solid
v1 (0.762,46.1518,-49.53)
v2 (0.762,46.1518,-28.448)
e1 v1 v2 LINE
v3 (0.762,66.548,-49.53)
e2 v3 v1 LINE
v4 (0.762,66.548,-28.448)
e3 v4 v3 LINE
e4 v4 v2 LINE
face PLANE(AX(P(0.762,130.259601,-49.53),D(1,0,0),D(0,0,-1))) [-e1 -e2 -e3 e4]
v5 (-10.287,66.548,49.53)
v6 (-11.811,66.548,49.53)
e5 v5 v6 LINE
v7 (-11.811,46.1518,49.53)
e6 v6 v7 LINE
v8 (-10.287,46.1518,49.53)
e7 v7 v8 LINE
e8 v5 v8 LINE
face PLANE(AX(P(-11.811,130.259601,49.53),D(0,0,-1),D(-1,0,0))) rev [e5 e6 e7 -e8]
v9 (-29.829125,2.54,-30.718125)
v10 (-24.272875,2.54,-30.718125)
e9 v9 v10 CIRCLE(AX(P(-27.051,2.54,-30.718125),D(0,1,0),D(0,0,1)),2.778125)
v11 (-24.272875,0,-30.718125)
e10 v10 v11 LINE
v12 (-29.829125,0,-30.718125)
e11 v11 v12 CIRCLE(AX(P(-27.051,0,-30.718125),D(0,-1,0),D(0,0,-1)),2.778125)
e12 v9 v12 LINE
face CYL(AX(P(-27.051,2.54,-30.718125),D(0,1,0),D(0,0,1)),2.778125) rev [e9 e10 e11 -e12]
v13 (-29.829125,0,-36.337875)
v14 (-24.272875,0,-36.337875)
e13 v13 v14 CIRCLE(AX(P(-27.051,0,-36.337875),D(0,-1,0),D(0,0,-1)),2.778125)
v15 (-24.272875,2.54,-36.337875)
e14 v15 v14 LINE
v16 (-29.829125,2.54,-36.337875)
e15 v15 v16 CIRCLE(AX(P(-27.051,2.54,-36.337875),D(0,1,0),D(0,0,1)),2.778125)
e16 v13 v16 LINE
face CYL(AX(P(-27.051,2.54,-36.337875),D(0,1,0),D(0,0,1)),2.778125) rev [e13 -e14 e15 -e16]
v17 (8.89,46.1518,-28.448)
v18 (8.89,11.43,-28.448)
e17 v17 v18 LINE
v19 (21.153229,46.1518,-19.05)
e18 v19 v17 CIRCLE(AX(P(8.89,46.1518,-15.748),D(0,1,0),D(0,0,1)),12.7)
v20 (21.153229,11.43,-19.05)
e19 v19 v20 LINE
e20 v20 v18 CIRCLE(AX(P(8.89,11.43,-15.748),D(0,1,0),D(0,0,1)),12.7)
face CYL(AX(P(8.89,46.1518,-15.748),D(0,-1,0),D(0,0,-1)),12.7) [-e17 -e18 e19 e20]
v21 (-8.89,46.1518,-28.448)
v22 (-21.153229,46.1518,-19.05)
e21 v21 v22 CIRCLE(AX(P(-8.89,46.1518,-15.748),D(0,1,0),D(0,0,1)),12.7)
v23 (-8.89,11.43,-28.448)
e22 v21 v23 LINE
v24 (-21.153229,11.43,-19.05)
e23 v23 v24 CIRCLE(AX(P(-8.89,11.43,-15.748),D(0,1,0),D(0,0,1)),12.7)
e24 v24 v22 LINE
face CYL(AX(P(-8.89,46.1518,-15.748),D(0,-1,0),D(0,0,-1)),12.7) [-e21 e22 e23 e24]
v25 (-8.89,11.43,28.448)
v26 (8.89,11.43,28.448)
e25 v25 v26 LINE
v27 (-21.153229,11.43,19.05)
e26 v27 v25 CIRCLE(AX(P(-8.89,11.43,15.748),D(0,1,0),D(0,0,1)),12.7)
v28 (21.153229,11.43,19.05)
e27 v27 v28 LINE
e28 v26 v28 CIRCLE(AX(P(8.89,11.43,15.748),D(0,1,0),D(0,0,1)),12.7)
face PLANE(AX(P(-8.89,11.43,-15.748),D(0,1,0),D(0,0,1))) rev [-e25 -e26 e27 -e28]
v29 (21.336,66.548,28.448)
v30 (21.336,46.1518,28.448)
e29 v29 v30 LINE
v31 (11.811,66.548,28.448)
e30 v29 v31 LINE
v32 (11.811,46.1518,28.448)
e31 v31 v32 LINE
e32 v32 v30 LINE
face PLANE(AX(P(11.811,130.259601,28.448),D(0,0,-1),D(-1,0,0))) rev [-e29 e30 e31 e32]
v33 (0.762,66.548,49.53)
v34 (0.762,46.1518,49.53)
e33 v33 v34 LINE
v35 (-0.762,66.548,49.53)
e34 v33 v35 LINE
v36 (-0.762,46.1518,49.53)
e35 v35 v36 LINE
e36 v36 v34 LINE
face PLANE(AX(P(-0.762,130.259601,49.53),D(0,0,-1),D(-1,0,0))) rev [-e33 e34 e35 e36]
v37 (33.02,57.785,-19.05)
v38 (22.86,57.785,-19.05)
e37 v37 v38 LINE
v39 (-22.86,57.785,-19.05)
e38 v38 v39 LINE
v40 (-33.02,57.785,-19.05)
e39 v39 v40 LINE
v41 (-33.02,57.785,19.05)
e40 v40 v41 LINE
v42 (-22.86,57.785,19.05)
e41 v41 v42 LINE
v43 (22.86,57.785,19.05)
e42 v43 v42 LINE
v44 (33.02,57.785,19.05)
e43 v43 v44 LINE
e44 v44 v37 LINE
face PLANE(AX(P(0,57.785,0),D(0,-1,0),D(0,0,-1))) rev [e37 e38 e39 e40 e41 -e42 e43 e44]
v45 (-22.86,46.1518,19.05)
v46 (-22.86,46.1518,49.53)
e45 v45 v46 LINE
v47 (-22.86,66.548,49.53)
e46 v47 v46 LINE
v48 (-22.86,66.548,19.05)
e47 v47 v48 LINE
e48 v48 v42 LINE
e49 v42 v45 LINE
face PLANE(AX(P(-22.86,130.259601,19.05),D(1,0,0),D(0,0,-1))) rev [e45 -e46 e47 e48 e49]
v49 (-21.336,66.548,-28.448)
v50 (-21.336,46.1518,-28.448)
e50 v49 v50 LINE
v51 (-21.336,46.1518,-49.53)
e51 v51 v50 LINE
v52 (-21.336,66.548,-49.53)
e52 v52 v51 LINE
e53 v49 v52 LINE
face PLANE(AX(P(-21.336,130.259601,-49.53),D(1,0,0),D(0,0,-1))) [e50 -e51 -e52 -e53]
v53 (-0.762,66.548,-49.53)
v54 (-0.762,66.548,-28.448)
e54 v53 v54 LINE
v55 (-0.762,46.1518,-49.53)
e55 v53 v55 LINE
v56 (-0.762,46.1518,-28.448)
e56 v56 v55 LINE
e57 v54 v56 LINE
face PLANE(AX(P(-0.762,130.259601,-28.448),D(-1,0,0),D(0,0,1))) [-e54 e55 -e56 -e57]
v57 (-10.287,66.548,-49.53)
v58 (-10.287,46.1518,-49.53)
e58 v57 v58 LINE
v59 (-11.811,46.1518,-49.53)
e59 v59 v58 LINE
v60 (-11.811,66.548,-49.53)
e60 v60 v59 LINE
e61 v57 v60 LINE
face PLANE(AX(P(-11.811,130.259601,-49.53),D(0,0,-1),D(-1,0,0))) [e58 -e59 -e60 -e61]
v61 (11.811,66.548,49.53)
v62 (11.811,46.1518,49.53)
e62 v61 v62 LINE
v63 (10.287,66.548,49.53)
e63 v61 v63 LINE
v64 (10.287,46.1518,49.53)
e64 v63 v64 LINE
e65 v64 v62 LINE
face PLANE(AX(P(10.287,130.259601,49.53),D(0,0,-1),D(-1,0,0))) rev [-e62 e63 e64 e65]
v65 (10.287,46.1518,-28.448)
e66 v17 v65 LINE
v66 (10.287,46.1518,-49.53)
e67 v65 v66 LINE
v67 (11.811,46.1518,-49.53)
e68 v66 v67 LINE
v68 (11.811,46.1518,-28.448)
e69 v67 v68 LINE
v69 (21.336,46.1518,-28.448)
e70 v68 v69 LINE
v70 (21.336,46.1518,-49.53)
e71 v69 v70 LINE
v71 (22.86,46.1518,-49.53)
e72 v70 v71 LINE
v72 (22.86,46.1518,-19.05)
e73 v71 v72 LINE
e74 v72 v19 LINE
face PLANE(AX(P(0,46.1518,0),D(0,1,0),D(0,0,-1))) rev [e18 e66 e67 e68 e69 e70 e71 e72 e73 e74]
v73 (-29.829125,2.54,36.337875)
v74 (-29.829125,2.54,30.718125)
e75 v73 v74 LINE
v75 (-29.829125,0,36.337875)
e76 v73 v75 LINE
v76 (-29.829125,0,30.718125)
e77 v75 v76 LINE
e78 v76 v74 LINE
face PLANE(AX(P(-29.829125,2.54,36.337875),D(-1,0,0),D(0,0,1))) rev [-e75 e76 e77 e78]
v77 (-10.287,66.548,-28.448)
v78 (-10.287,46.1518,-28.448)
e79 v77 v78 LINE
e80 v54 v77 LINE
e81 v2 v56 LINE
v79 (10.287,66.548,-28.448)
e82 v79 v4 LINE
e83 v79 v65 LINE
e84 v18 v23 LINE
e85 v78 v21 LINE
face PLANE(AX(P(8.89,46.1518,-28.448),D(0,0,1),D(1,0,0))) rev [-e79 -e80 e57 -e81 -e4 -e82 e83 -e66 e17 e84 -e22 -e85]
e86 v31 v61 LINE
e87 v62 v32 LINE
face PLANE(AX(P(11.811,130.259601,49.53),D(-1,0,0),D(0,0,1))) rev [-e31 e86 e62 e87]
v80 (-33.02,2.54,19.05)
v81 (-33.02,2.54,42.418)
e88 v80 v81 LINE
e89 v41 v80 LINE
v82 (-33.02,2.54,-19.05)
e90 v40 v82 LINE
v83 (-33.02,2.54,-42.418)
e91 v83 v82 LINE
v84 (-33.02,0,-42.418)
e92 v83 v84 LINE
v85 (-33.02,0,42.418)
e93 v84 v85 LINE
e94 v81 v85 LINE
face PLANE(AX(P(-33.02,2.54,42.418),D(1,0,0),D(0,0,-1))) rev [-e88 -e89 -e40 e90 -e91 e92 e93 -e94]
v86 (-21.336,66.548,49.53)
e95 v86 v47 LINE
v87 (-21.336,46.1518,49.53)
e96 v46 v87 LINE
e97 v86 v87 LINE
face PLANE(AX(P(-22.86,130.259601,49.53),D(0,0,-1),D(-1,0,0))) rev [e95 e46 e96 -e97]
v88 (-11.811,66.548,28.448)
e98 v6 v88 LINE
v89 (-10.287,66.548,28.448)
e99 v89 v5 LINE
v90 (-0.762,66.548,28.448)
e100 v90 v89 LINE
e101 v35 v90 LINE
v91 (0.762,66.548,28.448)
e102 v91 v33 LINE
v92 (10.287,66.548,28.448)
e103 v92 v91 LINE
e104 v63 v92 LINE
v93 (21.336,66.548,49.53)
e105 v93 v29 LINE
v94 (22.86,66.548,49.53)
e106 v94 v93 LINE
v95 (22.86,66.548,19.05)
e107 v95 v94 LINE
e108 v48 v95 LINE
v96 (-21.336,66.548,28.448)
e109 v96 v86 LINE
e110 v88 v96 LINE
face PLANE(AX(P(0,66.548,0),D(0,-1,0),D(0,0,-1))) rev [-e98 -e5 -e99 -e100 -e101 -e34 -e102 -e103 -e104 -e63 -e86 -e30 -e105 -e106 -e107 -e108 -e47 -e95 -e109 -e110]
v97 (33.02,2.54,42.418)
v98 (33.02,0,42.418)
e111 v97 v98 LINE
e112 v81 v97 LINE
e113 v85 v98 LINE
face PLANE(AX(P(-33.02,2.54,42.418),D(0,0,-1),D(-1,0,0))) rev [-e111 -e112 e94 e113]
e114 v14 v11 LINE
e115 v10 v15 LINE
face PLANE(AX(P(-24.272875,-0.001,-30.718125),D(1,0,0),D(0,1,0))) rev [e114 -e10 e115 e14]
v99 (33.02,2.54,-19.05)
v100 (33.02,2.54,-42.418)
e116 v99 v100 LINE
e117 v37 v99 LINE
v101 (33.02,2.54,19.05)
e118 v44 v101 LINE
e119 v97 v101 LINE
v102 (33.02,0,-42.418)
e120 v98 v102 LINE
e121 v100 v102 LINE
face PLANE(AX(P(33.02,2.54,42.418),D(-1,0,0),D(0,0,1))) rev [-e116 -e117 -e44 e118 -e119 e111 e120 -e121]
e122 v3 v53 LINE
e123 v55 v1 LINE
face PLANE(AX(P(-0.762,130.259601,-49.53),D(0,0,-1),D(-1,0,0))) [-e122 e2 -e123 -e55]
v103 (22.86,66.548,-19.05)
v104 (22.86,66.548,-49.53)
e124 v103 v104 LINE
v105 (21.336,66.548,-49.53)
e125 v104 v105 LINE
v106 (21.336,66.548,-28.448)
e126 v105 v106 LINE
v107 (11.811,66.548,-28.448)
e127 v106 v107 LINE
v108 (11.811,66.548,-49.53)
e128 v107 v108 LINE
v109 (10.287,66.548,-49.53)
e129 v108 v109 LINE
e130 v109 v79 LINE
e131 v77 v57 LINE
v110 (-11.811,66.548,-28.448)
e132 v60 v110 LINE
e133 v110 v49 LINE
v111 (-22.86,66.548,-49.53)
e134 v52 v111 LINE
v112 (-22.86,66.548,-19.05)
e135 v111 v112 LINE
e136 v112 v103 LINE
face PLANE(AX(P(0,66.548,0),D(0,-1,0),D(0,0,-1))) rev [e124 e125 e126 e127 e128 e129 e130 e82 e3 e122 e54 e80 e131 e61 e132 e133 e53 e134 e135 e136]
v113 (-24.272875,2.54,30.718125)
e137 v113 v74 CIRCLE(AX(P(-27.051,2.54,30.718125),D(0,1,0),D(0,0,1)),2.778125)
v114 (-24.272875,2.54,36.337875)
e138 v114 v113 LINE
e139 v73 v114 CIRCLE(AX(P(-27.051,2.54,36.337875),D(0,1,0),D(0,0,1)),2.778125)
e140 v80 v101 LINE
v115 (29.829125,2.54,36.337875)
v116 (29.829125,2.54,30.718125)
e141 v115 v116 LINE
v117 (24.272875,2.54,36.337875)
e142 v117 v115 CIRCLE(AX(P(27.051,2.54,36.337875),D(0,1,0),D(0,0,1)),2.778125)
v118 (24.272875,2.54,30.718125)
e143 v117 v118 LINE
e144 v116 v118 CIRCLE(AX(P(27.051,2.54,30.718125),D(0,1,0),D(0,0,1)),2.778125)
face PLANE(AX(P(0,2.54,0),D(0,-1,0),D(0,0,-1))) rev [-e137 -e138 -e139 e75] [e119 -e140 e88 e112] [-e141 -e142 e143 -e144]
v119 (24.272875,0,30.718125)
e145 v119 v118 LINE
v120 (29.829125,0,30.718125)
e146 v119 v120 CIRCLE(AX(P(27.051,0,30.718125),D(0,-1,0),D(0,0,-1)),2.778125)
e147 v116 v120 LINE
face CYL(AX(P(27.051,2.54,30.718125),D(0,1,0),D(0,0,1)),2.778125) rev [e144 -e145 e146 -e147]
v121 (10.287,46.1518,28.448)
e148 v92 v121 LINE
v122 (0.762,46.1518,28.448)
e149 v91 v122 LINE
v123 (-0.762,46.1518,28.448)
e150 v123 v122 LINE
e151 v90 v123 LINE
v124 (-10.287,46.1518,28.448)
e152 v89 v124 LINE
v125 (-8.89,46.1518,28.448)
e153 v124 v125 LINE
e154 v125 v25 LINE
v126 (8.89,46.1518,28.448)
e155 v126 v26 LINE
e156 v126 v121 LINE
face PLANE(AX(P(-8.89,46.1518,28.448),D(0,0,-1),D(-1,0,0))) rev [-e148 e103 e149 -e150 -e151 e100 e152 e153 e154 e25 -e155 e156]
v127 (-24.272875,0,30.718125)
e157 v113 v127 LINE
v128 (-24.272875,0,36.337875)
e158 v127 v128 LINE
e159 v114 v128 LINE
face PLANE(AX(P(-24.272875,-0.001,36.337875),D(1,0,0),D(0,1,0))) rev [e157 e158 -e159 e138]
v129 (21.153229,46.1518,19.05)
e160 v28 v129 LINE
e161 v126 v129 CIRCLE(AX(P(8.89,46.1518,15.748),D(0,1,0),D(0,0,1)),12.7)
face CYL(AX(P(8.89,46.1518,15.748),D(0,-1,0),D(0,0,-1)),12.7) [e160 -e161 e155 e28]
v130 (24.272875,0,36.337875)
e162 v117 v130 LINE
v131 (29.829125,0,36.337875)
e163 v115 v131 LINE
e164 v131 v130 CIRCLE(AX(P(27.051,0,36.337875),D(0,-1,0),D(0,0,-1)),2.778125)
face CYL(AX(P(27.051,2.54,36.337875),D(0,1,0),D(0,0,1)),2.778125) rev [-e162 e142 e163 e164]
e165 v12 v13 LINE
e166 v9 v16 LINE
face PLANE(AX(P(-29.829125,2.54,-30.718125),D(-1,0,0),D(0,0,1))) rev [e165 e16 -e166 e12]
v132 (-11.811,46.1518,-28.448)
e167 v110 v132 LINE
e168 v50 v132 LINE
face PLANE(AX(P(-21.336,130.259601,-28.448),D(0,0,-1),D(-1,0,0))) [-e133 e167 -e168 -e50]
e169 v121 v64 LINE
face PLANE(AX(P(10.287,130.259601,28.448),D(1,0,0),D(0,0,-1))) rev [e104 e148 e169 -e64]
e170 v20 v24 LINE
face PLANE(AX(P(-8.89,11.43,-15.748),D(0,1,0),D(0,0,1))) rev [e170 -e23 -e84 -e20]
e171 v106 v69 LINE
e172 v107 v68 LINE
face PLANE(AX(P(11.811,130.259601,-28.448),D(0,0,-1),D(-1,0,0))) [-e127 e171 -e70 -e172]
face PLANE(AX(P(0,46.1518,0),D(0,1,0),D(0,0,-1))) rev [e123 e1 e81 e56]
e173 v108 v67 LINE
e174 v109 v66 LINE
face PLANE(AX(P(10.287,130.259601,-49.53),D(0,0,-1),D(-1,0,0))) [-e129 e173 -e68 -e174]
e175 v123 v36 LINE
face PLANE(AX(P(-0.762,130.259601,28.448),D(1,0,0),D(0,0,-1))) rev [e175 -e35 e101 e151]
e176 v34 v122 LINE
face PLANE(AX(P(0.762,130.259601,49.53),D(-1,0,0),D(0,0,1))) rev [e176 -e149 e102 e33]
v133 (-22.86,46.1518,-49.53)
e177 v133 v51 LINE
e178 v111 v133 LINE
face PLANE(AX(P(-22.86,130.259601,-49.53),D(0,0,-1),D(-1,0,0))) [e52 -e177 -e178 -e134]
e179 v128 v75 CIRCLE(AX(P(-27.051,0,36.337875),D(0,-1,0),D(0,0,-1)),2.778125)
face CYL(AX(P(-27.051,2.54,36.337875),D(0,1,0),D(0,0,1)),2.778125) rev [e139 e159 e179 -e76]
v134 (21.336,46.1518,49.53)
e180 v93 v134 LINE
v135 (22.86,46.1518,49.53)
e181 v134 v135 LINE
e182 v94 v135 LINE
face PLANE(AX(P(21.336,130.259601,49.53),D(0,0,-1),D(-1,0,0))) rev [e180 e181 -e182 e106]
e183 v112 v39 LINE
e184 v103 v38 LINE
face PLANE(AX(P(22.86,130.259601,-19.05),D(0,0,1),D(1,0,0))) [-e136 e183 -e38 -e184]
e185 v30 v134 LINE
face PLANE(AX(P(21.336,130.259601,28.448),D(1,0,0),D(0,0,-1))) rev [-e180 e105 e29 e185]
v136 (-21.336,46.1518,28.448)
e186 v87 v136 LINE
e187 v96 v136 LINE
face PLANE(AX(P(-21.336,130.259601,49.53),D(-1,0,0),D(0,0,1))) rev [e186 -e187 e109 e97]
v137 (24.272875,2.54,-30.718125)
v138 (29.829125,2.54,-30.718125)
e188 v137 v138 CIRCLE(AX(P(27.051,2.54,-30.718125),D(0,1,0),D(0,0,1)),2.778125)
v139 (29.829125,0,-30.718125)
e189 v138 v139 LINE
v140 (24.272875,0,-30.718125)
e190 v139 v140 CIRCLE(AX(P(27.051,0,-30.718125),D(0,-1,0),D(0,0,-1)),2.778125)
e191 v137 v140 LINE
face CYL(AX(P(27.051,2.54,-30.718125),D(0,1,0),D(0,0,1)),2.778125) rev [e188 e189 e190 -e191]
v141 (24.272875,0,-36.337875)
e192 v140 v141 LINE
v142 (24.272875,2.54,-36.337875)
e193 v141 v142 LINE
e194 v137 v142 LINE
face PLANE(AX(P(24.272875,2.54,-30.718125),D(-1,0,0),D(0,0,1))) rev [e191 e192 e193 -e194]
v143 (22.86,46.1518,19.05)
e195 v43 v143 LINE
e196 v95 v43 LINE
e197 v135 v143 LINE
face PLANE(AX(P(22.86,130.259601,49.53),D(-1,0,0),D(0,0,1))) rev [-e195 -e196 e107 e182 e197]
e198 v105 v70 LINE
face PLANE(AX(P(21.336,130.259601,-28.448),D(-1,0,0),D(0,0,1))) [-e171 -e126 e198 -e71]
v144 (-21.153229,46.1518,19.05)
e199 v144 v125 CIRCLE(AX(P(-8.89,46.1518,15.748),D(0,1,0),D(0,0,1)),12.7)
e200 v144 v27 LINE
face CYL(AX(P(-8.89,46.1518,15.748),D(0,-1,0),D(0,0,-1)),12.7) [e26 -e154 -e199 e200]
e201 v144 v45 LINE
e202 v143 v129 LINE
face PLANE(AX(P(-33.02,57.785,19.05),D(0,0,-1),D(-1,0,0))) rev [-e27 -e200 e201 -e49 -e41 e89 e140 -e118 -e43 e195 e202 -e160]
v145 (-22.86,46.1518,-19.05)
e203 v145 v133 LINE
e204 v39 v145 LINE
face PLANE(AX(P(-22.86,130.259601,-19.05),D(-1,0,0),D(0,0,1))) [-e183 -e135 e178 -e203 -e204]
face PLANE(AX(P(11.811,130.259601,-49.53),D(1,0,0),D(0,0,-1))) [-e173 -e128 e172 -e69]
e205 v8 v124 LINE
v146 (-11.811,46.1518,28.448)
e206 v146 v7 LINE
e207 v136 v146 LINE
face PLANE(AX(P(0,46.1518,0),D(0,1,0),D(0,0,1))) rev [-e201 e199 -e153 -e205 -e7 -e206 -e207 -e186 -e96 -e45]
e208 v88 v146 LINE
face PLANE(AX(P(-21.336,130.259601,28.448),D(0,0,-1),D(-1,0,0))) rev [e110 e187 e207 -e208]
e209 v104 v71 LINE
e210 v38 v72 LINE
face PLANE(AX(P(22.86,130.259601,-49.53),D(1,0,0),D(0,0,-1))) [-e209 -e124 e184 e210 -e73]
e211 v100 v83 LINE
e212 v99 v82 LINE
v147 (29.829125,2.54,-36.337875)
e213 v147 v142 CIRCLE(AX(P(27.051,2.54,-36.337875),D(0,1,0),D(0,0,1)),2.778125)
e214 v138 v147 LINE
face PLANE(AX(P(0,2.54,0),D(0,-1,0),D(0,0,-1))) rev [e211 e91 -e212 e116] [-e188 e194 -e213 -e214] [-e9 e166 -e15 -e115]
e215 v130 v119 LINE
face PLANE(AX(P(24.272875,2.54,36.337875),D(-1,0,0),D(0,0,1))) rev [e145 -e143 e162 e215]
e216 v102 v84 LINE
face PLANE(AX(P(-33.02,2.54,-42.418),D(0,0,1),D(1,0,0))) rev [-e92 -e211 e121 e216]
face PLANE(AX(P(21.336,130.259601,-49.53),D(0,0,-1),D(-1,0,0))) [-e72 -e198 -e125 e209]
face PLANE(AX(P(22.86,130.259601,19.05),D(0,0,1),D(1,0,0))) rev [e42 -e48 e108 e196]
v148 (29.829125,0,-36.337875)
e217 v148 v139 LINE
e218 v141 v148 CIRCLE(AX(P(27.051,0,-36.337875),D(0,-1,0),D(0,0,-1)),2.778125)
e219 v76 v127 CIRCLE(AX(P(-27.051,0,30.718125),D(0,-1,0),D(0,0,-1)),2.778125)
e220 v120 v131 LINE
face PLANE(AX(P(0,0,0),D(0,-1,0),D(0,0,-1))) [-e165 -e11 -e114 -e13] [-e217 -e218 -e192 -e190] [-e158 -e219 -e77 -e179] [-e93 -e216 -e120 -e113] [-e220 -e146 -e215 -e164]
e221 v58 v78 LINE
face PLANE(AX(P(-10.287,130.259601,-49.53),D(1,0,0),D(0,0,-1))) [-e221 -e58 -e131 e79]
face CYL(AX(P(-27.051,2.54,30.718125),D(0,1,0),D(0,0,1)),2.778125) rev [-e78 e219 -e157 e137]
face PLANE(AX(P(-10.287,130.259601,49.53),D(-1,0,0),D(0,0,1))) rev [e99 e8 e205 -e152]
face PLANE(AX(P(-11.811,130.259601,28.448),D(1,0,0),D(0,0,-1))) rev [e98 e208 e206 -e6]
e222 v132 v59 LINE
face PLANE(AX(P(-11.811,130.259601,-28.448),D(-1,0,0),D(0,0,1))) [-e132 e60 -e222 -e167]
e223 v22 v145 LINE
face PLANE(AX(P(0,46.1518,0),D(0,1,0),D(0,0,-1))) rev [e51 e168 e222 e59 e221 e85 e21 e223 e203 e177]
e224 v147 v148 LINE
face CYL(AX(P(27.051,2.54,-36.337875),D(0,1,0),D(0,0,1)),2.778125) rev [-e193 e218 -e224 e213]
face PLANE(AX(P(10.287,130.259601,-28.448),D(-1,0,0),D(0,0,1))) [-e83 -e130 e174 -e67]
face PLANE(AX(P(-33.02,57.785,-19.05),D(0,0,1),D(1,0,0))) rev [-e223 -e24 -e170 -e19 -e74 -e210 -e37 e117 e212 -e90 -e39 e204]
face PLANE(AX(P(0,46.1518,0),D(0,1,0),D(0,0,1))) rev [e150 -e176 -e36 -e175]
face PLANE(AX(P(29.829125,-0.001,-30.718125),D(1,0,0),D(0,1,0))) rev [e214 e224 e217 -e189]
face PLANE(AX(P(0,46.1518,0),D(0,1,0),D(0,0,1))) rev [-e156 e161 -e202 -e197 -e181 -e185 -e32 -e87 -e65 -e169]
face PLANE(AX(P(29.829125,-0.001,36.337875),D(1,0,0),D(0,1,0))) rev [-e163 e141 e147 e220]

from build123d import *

# Parameters (mm, degrees)
SKETCH1_W                           = 66.04
SKETCH1_H                           = 84.836
BOSS_EXTRUDE1_DEPTH                 = 2.54
F_7_32_0_21875_DIAMETER_SLOT1_DEPTH = 2.54
SKETCH4_W                           = 66.04
SKETCH4_H                           = 38.1
BOSS_EXTRUDE2_DEPTH                 = 55.245
BOSS_EXTRUDE3_DEPTH                 = 34.7218
BOSS_EXTRUDE4_DEPTH                 = 20.3962


# Read off the part's stored shape, not the designer's step: 7/32 (0.21875) Diameter Slot1
with BuildPart() as part:
    # Sketch1 → Boss-Extrude1 (new body)
    with BuildSketch(Plane(origin=(0, 0, 0), x_dir=(1, 0, 0), z_dir=(0, 1, 0))):
        Rectangle(SKETCH1_W, SKETCH1_H)
    extrude(amount=BOSS_EXTRUDE1_DEPTH)

    # 7/32 (0.21875) Diameter Slot1 outline → 7/32 (0.21875) Diameter Slot1 (cut)
    with BuildSketch(Plane(origin=(0, 0, 0), x_dir=(1, 0, 0), z_dir=(0, 1, 0))):
        with BuildLine():
            Line((-24.272875, -36.337875), (-24.272875, -30.718125))
            ThreePointArc((-24.272875, -30.718125), (-27.051, -27.94), (-29.829125, -30.718125))
            Line((-29.829125, -30.718125), (-29.829125, -36.337875))
            ThreePointArc((-29.829125, -36.337875), (-27.051, -39.116), (-24.272875, -36.337875))
        make_face()
        with BuildLine():
            ThreePointArc((-24.272875, 36.337875), (-27.051, 39.116), (-29.829125, 36.337875))
            Line((-29.829125, 36.337875), (-29.829125, 30.718125))
            ThreePointArc((-29.829125, 30.718125), (-27.051, 27.94), (-24.272875, 30.718125))
            Line((-24.272875, 30.718125), (-24.272875, 36.337875))
        make_face()
        with BuildLine():
            Line((29.829125, -36.337875), (29.829125, -30.718125))
            ThreePointArc((29.829125, -30.718125), (27.051, -27.94), (24.272875, -30.718125))
            Line((24.272875, -30.718125), (24.272875, -36.337875))
            ThreePointArc((24.272875, -36.337875), (27.051, -39.116), (29.829125, -36.337875))
        make_face()
        with BuildLine():
            ThreePointArc((29.829125, 36.337875), (27.051, 39.116), (24.272875, 36.337875))
            Line((24.272875, 36.337875), (24.272875, 30.718125))
            ThreePointArc((24.272875, 30.718125), (27.051, 27.94), (29.829125, 30.718125))
            Line((29.829125, 30.718125), (29.829125, 36.337875))
        make_face()
    extrude(amount=F_7_32_0_21875_DIAMETER_SLOT1_DEPTH, mode=Mode.SUBTRACT)

    # Sketch4 → Boss-Extrude2 (add)
    with BuildSketch(Plane(origin=(0, 2.54, 0), x_dir=(1, 0, 0), z_dir=(0, 1, 0))):
        Rectangle(SKETCH4_W, SKETCH4_H)
    extrude(amount=BOSS_EXTRUDE2_DEPTH)

    # Sketch5 → Boss-Extrude3 (add)
    with BuildSketch(Plane(origin=(0, 11.43, 0), x_dir=(1, 0, 0), z_dir=(0, 1, 0))):
        with BuildLine():
            Line((-21.59, 15.748), (-21.59, -15.748))
            ThreePointArc((-21.59, -15.748), (-17.870256121, -24.728256121), (-8.89, -28.448))
            Line((-8.89, -28.448), (8.89, -28.448))
            ThreePointArc((8.89, -28.448), (17.870256121, -24.728256121), (21.59, -15.748))
            Line((21.59, -15.748), (21.59, 15.748))
            ThreePointArc((21.59, 15.748), (17.870256121, 24.728256121), (8.89, 28.448))
            Line((8.89, 28.448), (-8.89, 28.448))
            ThreePointArc((-8.89, 28.448), (-17.870256121, 24.728256121), (-21.59, 15.748))
        make_face()
    extrude(amount=BOSS_EXTRUDE3_DEPTH)

    # Sketch6 → Boss-Extrude4 (add)
    with BuildSketch(Plane(origin=(0, 46.1518, 0), x_dir=(1, 0, 0), z_dir=(0, 1, 0))):
        Polygon((22.86, -19.05), (-22.86, -19.05), (-22.86, -49.53), (-21.336, -49.53), (-21.336, -28.448), (-11.811, -28.448), (-11.811, -49.53), (-10.287, -49.53), (-10.287, -28.448), (-0.762, -28.448), (-0.762, -49.53), (0.762, -49.53), (0.762, -28.448), (10.287, -28.448), (10.287, -49.53), (11.811, -49.53), (11.811, -28.448), (21.336, -28.448), (21.336, -49.53), (22.86, -49.53), align=None)
    boss_extrude4 = extrude(amount=BOSS_EXTRUDE4_DEPTH)

    # Mirror1: Boss-Extrude4 across plane
    add(boss_extrude4.mirror(Plane.XY))


solid = part.part
